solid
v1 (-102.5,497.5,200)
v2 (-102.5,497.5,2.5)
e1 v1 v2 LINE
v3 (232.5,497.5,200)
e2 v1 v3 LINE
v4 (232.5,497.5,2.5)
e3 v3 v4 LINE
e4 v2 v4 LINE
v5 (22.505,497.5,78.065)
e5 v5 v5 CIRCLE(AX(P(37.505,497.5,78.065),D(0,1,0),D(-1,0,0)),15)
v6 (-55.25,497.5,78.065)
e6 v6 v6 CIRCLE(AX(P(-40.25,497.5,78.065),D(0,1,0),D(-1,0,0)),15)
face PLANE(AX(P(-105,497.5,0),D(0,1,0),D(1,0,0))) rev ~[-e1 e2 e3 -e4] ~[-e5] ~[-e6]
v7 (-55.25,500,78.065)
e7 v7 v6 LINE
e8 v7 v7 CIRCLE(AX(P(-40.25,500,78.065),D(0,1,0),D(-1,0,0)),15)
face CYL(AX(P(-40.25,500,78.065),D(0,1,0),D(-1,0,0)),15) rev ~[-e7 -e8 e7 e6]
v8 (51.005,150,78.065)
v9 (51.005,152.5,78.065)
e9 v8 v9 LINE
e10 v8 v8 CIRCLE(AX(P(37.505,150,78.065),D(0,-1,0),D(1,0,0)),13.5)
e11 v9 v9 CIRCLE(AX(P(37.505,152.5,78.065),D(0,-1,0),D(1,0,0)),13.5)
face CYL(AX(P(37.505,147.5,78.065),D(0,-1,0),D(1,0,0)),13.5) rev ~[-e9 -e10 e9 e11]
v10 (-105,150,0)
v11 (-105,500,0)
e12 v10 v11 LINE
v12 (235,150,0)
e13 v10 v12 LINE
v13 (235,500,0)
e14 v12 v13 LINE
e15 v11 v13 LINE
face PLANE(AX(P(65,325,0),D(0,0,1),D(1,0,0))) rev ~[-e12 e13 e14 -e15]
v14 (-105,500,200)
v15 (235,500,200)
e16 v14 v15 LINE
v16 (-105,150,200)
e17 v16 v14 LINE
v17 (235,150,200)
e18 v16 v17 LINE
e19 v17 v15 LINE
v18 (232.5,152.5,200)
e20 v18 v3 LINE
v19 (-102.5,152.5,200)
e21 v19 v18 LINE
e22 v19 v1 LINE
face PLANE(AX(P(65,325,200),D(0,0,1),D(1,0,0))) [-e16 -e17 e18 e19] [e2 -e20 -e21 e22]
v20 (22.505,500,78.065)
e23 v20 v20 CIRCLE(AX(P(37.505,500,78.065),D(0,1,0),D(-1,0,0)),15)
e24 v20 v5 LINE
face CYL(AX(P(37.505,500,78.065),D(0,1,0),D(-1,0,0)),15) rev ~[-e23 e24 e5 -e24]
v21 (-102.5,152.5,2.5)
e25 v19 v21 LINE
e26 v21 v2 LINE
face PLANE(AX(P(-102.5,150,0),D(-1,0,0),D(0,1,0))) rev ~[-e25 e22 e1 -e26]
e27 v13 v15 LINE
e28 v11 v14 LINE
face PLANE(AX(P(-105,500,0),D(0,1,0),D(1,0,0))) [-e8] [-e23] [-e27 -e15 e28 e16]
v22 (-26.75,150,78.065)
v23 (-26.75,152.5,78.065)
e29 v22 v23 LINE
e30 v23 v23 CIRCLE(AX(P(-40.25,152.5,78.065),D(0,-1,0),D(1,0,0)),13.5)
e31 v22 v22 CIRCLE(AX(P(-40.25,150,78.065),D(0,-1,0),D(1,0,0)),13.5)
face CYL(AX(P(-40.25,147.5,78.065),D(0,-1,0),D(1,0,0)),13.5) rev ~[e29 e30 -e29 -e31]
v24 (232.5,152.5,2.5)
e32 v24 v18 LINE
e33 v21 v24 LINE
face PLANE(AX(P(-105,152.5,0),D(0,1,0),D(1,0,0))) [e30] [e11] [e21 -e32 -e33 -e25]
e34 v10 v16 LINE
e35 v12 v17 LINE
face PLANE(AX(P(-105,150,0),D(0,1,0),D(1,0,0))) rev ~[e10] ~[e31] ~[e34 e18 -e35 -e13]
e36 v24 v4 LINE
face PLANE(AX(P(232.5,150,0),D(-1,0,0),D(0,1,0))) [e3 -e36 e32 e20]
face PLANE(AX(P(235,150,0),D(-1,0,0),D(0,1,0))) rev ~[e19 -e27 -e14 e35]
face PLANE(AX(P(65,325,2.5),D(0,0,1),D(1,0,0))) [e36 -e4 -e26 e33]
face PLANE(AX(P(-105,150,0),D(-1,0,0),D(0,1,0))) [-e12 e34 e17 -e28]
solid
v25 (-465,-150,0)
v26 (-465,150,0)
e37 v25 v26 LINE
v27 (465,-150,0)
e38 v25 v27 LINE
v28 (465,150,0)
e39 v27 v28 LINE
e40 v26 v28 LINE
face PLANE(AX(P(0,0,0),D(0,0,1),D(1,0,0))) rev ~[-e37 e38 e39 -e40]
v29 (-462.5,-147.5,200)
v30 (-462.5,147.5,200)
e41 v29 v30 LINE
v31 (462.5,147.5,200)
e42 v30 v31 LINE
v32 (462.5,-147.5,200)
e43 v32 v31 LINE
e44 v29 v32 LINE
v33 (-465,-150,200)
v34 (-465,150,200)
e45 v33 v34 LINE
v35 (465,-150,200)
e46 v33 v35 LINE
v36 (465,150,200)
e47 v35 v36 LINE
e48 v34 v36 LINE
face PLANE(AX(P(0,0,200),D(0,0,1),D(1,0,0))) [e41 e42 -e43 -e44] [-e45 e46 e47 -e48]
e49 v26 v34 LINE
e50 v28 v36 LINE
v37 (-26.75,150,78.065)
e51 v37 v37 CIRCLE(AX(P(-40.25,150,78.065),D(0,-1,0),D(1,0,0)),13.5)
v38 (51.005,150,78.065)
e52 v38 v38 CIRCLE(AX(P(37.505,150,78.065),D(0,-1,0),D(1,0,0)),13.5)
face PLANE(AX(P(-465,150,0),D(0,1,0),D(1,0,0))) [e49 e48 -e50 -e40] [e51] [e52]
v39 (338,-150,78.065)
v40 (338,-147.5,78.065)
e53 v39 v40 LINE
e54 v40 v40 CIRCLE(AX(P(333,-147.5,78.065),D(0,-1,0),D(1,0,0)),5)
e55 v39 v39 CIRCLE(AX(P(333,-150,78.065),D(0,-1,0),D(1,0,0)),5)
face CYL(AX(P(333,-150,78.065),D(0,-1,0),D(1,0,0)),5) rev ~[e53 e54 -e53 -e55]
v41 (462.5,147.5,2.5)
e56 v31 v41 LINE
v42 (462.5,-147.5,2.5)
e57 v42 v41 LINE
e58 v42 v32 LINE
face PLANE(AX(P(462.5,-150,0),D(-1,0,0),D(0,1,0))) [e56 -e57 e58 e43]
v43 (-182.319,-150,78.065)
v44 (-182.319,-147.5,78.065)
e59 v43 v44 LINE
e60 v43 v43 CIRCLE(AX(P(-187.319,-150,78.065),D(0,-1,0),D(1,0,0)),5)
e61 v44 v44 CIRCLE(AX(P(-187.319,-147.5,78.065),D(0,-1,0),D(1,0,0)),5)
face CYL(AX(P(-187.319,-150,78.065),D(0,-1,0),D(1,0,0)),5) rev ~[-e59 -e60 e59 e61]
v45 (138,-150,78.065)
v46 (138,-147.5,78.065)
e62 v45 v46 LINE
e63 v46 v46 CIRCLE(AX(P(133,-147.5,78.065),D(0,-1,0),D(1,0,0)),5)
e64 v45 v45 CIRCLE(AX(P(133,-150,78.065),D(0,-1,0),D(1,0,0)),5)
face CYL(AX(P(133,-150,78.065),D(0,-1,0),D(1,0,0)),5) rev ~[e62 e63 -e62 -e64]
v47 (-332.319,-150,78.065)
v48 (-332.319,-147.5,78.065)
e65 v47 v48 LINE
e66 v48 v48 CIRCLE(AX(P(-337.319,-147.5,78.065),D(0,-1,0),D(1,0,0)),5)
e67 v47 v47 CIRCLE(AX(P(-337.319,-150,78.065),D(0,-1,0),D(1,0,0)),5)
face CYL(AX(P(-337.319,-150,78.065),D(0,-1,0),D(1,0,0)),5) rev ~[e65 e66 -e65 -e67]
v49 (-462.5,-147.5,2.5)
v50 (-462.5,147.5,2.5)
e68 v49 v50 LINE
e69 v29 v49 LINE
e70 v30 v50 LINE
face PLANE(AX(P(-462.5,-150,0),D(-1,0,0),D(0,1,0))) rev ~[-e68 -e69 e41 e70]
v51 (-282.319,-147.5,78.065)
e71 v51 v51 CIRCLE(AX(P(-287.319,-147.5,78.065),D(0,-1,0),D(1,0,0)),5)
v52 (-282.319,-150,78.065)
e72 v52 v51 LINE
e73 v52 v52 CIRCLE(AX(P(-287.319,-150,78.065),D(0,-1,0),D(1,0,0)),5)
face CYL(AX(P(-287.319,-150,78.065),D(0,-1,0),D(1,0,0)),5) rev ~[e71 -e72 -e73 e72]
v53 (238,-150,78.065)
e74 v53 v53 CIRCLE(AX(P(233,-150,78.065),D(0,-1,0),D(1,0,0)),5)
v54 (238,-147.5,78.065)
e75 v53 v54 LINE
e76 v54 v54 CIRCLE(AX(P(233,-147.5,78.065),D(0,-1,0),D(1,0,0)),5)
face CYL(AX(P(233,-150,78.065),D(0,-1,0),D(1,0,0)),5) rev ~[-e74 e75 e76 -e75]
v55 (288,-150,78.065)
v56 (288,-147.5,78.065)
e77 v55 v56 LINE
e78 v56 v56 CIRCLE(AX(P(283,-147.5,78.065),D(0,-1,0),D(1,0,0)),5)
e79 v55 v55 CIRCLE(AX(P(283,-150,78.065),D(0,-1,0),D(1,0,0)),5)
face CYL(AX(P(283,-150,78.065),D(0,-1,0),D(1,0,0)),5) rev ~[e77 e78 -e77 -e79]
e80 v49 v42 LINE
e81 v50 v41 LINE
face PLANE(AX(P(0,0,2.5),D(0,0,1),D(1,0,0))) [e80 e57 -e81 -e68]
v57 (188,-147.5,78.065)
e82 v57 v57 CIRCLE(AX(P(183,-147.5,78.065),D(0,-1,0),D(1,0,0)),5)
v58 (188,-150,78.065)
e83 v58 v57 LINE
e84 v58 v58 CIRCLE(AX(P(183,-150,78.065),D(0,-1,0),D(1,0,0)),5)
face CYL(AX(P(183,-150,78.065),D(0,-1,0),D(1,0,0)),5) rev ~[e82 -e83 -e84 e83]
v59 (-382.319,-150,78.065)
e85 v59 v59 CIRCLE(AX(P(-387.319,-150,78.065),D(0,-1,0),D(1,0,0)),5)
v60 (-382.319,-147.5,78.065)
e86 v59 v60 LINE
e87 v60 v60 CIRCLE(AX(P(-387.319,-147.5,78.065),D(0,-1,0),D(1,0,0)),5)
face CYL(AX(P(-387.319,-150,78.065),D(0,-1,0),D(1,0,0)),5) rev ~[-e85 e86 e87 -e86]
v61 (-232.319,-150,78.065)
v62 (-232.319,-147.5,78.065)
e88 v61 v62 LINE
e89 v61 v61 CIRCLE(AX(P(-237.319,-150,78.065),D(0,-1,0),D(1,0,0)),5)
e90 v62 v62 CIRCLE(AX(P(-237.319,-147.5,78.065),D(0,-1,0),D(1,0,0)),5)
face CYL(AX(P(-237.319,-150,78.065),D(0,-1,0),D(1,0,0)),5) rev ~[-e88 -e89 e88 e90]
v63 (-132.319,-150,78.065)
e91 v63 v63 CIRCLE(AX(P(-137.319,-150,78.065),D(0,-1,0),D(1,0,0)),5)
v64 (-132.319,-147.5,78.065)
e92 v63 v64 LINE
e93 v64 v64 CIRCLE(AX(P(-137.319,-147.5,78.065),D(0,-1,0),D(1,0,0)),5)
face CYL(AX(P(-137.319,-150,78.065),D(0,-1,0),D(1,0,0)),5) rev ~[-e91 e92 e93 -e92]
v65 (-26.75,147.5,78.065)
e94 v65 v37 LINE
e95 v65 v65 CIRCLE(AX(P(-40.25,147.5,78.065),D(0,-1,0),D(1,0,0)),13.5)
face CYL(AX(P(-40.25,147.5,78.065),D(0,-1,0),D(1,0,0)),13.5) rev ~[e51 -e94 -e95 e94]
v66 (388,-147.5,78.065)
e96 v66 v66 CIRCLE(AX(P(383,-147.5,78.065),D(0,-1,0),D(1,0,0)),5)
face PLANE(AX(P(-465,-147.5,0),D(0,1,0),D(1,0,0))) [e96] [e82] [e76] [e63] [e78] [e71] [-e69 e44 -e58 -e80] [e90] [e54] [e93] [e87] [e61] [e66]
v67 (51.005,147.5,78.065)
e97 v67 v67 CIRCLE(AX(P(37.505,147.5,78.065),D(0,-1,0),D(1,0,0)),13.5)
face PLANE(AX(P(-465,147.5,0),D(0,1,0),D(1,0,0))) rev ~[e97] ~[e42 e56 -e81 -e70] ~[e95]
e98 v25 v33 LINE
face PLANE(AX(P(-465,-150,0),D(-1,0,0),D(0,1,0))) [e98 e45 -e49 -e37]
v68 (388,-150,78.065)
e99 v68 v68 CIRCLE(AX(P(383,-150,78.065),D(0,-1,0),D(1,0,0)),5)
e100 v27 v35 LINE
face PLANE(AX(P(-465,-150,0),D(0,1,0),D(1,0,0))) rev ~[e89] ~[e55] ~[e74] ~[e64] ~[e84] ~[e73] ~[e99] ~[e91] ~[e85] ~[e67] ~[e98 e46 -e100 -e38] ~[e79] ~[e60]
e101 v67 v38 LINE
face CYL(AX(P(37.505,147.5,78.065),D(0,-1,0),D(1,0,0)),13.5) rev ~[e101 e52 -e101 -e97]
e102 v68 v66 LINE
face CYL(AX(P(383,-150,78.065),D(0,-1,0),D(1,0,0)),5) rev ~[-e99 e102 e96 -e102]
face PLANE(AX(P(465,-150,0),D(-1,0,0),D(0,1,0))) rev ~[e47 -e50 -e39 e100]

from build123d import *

# Parameters (mm, degrees)
F0_W      = 930
F0_H      = 300
F2_DEPTH  = 200
F3_T      = -2.5
F1_W      = 340
F1_H      = 350
F4_DEPTH  = 200
F5_T      = -2.5
F6_R      = 5
F7_DEPTH  = 25
F8_R      = 13.5
F9_DEPTH  = 25
F10_R     = 15
F11_DEPTH = 25


# Not quite as in the source:
# - a feature names something its author has since deleted; it is built from what else it names


with BuildPart() as f2:
    # F0 (on Top) → F2 (new body)
    with BuildSketch(Plane.XY):
        Rectangle(F0_W, F0_H)
    extrude(amount=F2_DEPTH)

    # F3
    f3_openings = [f2.faces().sort_by_distance(p)[0] for p in [
        (0, 0, 200),
    ]]
    offset(amount=F3_T, openings=f3_openings)

    # F6 (on face) → F7 (cut)
    with BuildSketch(Plane.XZ.offset(150)):
        with Locations((133, 78.065)):
            Circle(F6_R)
        with Locations((183, 78.065)):
            Circle(F6_R)
        with Locations((233, 78.065)):
            Circle(F6_R)
        with Locations((283, 78.065)):
            Circle(F6_R)
        with Locations((383, 78.065)):
            Circle(F6_R)
        with Locations((333, 78.065)):
            Circle(F6_R)
        with Locations((-137.319, 78.065)):
            Circle(F6_R)
        with Locations((-187.319, 78.065)):
            Circle(F6_R)
        with Locations((-237.319, 78.065)):
            Circle(F6_R)
        with Locations((-287.319, 78.065)):
            Circle(F6_R)
        with Locations((-337.319, 78.065)):
            Circle(F6_R)
        with Locations((-387.319, 78.065)):
            Circle(F6_R)
    extrude(amount=-F7_DEPTH, mode=Mode.SUBTRACT)


with BuildPart() as f4:
    # F1 (on Top) → F4 (new body)
    with BuildSketch(Plane.XY):
        with Locations((65, 325)):
            Rectangle(F1_W, F1_H)
    extrude(amount=F4_DEPTH)

    # F5
    f5_openings = [f4.faces().sort_by_distance(p)[0] for p in [
        (65, 325, 200),
    ]]
    offset(amount=F5_T, openings=f5_openings)


with BuildPart() as f9_tool:
    # F8 (on face) → F9 (new body)
    with BuildSketch(Plane.XZ.offset(-147.5)):
        with Locations((37.505, 78.065)):
            Circle(F8_R)
        with Locations((-40.25, 78.065)):
            Circle(F8_R)
    extrude(amount=-F9_DEPTH)


with BuildPart() as f2_1:
    add(f2.part)

    # F9: cut by f9_tool
    add(f9_tool.part, mode=Mode.SUBTRACT)


with BuildPart() as f4_1:
    add(f4.part)

    # F9: cut by f9_tool
    add(f9_tool.part, mode=Mode.SUBTRACT)

    # F10 (on face) → F11 (cut)
    with BuildSketch(Plane(origin=(0, 500, 0), x_dir=(-1, 0, 0), z_dir=(0, 1, 0))):
        with Locations((-37.505, 78.065)):
            Circle(F10_R)
        with Locations((40.25, 78.065)):
            Circle(F10_R)
    extrude(amount=-F11_DEPTH, mode=Mode.SUBTRACT)


solid = Compound([f2_1.part, f4_1.part])
